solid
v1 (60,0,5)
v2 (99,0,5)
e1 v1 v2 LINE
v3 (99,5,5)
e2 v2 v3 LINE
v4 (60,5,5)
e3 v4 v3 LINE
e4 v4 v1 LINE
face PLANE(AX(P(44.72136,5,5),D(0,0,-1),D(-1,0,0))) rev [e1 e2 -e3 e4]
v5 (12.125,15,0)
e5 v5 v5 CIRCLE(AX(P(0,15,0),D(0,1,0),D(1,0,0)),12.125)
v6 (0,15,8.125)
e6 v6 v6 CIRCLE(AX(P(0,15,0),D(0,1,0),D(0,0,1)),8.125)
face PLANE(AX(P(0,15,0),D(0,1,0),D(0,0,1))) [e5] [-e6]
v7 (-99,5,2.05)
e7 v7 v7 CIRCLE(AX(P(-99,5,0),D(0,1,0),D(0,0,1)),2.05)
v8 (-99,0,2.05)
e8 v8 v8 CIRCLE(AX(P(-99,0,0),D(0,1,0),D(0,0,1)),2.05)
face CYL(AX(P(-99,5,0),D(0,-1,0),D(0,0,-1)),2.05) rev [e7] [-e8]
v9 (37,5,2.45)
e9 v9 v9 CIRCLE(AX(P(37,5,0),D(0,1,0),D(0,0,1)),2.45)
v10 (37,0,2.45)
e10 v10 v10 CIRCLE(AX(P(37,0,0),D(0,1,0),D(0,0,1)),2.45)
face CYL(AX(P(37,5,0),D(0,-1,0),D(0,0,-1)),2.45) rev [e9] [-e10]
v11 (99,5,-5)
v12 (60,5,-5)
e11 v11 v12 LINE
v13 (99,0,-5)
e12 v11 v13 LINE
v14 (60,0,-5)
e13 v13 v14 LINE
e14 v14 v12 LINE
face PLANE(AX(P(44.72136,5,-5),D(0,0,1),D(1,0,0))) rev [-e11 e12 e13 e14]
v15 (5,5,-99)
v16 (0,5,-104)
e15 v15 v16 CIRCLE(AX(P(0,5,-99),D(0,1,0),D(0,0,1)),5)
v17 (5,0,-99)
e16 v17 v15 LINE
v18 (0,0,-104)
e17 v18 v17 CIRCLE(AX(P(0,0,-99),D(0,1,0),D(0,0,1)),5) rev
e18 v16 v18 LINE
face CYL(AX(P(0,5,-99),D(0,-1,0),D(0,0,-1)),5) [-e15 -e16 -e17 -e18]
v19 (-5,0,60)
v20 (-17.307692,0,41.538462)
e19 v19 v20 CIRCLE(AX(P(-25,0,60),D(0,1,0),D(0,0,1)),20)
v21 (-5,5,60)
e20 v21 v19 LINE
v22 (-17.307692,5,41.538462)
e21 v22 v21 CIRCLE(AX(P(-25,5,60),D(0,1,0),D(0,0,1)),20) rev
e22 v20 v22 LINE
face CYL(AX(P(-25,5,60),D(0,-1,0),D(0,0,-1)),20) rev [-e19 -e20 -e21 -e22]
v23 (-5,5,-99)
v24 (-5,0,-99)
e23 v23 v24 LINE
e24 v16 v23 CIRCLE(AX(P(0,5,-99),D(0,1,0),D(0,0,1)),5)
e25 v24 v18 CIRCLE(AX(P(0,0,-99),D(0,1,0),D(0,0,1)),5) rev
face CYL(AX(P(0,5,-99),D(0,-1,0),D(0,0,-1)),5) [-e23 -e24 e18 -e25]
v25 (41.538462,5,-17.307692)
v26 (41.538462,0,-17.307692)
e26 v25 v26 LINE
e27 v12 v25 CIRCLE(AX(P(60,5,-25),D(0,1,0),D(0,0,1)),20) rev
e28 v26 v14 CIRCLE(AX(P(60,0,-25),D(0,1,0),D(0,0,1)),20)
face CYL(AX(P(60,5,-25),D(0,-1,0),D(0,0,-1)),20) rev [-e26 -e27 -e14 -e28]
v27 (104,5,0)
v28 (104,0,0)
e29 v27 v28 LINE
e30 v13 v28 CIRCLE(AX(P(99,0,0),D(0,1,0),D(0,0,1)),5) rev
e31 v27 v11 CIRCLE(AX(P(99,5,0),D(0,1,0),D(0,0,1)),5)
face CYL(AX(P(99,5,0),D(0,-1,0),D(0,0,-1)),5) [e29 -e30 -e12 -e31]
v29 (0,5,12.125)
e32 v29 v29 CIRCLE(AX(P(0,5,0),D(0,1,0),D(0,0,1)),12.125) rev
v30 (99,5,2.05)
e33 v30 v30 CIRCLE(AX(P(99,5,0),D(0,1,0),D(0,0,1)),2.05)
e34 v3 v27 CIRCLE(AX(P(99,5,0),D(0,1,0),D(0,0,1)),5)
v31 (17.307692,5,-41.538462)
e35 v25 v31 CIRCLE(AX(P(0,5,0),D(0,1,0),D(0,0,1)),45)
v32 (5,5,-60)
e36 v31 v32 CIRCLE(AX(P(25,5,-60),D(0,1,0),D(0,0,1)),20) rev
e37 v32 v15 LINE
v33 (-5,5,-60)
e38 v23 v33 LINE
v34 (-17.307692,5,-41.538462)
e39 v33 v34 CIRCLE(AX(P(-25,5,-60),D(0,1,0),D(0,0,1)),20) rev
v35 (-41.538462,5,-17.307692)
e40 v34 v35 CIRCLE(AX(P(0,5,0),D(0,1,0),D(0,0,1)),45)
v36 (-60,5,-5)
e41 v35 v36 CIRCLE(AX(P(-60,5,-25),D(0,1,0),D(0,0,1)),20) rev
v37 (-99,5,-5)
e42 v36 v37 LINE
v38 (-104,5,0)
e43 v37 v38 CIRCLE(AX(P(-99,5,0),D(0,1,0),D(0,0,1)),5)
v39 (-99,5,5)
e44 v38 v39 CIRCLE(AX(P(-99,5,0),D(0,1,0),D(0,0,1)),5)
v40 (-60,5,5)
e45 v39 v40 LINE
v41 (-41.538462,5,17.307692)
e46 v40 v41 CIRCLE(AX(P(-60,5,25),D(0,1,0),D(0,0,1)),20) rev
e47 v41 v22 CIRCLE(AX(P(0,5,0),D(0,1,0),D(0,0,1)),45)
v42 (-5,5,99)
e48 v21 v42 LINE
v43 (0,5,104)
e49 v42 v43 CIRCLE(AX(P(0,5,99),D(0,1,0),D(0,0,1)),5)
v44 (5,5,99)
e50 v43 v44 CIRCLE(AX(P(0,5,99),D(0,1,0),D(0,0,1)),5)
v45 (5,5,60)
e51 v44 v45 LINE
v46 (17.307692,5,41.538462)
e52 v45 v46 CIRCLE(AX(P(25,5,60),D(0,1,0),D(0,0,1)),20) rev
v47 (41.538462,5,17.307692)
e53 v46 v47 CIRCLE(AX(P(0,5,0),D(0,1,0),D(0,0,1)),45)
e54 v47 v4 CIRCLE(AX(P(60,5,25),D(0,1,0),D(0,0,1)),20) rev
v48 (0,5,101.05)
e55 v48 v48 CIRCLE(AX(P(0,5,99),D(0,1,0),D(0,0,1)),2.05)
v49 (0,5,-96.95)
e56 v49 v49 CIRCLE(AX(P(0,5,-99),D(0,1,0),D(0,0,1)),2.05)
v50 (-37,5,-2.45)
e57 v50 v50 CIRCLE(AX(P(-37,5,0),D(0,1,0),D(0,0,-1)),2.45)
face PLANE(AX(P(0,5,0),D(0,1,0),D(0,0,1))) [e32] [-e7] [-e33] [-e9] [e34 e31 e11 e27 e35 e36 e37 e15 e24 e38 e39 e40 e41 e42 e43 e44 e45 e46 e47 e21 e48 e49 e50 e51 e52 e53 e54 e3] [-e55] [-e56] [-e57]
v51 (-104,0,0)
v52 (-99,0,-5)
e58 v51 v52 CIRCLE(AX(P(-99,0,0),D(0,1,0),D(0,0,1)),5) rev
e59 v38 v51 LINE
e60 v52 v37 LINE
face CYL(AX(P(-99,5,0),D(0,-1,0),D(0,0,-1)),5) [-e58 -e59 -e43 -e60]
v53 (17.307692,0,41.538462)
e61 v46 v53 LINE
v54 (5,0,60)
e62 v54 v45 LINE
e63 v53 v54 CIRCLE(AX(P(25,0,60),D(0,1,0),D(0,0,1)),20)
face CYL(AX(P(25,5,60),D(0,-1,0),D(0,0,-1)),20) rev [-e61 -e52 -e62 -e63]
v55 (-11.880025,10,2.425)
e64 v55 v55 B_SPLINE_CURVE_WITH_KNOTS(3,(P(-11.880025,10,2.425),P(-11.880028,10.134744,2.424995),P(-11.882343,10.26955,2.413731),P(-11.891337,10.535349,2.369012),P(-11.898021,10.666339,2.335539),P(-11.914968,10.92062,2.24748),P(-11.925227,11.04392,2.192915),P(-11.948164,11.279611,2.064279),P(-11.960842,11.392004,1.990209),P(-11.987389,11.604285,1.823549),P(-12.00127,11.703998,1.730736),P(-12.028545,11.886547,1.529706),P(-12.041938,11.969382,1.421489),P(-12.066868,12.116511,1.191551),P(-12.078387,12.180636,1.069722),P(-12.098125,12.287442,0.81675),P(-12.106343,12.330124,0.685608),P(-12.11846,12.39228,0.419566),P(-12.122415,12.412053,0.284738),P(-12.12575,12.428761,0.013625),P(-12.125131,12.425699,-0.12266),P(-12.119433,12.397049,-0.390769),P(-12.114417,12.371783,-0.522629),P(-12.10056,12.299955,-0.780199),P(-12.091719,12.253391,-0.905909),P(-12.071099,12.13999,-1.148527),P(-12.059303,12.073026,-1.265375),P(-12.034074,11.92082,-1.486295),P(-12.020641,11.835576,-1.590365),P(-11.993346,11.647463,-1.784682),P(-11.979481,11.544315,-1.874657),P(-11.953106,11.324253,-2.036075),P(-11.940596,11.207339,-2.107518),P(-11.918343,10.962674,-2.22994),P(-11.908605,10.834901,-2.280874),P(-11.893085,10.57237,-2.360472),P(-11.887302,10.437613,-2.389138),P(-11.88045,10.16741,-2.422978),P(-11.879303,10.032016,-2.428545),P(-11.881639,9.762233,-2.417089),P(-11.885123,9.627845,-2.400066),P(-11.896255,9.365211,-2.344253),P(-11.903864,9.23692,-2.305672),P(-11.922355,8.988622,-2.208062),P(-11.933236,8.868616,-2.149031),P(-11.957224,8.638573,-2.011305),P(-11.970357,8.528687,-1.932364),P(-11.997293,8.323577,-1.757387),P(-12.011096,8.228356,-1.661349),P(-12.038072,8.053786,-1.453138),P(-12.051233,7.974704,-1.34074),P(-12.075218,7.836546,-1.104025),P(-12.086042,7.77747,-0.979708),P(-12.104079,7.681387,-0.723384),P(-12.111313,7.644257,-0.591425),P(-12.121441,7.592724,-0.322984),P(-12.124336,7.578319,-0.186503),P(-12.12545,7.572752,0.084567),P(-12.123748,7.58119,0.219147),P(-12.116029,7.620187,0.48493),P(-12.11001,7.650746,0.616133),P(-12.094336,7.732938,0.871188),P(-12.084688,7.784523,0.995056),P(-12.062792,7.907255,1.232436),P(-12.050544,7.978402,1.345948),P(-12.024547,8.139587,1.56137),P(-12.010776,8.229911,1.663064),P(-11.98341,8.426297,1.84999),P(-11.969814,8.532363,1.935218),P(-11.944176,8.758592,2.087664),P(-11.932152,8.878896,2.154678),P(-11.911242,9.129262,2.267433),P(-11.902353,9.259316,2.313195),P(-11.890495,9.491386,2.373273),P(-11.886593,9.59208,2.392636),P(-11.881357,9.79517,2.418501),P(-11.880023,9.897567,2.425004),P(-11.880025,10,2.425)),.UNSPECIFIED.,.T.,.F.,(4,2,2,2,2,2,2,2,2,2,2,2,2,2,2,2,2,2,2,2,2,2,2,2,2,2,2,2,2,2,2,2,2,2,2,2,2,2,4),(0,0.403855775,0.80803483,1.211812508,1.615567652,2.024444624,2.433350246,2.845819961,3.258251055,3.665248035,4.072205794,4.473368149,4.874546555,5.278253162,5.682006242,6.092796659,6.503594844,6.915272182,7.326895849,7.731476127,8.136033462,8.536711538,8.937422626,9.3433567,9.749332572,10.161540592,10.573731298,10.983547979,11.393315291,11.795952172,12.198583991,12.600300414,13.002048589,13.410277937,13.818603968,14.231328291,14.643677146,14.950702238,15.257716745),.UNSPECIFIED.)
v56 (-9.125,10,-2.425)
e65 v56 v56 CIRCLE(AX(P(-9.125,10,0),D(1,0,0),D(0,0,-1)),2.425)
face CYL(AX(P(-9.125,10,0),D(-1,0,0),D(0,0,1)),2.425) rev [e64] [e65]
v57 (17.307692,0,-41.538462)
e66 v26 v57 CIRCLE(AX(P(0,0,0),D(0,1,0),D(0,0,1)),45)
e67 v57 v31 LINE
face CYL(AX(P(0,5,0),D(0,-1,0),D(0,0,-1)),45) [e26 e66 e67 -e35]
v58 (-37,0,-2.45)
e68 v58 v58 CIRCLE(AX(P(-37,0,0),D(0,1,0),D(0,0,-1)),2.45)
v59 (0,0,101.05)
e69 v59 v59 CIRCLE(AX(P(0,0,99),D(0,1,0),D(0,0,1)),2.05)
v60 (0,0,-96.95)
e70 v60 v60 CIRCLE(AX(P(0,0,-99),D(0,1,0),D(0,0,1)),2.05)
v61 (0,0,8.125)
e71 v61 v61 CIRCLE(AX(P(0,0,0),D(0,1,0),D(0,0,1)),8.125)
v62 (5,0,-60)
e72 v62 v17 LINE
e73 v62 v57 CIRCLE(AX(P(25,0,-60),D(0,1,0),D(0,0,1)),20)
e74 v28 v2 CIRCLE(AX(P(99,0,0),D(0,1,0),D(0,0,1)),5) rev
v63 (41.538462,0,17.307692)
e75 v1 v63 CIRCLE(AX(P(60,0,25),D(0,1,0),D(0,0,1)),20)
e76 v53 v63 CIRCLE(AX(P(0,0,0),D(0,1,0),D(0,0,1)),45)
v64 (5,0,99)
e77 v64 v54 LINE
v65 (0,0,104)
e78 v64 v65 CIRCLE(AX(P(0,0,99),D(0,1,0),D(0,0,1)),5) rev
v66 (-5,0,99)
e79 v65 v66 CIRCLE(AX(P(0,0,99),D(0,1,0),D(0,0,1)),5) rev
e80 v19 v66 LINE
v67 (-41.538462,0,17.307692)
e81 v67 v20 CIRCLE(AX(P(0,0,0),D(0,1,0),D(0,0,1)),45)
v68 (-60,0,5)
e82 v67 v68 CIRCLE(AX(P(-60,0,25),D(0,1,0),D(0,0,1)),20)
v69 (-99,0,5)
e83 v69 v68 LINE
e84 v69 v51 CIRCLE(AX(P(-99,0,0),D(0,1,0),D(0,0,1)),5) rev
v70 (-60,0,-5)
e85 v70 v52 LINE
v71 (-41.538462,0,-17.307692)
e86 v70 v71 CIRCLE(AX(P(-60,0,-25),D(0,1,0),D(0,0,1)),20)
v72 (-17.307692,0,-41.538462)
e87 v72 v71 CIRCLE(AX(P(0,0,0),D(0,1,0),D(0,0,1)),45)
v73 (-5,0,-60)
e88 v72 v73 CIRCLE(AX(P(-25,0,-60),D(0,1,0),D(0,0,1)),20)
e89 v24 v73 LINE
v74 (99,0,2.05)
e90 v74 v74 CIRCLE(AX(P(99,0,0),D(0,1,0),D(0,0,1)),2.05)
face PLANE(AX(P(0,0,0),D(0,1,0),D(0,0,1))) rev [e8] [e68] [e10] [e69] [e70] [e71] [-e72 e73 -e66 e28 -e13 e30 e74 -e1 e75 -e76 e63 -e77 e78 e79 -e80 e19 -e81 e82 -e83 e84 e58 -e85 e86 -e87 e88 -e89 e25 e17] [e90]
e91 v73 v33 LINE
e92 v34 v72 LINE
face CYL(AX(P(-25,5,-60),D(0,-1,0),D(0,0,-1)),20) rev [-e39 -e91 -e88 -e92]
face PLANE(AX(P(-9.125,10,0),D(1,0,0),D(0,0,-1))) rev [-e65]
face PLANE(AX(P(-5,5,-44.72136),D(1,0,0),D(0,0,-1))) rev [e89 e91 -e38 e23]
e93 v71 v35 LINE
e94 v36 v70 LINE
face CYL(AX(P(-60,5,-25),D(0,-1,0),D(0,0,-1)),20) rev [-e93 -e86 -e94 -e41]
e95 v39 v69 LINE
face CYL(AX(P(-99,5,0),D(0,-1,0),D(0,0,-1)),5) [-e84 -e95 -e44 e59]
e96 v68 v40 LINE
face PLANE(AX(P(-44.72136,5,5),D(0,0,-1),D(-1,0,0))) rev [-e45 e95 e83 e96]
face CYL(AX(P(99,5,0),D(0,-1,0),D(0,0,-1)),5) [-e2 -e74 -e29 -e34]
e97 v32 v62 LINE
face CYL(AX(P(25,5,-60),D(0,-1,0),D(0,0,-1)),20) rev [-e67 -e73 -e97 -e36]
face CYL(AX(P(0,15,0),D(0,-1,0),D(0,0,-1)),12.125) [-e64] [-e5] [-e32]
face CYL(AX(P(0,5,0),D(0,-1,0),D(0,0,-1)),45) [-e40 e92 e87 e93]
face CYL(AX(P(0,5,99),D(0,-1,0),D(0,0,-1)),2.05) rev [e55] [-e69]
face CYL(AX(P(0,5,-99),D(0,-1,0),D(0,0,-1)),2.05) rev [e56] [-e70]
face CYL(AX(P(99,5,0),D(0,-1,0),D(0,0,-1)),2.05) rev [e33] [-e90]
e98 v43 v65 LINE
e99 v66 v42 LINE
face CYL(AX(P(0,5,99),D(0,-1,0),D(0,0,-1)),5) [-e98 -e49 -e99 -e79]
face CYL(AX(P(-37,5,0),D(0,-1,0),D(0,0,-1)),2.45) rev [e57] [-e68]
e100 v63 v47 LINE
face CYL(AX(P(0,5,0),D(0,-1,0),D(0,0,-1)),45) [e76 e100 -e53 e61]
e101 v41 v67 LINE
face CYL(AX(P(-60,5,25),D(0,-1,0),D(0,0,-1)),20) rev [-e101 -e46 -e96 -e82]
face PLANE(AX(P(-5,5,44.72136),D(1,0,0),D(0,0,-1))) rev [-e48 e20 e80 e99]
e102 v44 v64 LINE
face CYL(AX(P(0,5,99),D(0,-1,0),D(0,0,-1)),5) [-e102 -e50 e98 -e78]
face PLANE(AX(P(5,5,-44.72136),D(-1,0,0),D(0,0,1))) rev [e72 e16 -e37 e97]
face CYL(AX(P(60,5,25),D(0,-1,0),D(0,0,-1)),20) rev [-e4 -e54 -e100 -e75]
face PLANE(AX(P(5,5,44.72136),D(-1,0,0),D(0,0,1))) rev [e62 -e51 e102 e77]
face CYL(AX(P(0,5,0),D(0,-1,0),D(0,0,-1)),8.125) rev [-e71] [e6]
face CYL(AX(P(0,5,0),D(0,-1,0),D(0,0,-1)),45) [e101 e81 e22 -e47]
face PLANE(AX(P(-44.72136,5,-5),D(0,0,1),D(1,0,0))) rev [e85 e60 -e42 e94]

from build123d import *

# Parameters (mm, degrees)
CROQUIS1_R              = 45
CROQUIS1_R_2            = 2.45
CROQUIS1_R_3            = 8.125
SALIENTE_EXTRUIR1_DEPTH = 5
CROQUIS1_2_R            = 12.125
CROQUIS1_2_R_2          = 8.125
EXTRUIR_L_MINA1_DEPTH   = 15
CROQUIS2_R              = 2.425
CORTAR_EXTRUIR2_DEPTH   = 3
CROQUIS3_W              = 59.27864045
CROQUIS3_H              = 10
CROQUIS3_R              = 2.05
CROQUIS3_W_2            = 10
CROQUIS3_H_2            = 59.27864045
SALIENTE_EXTRUIR2_DEPTH = 5
REDONDEO1_R             = 5
REDONDEO2_R             = 20


with BuildPart() as part:
    # Croquis1 → Saliente-Extruir1 (new body)
    with BuildSketch(Plane(origin=(0, 0, 0), x_dir=(1, 0, 0), z_dir=(0, 1, 0))):
        with Locations(Location((0, 0, 0), (0, 0, 270))):
            Circle(CROQUIS1_R)
        with Locations(Location((37, 0, 0), (0, 0, 270))):
            Circle(CROQUIS1_R_2, mode=Mode.SUBTRACT)
        with Locations(Location((-37, 0, 0), (0, 0, 90))):
            Circle(CROQUIS1_R_2, mode=Mode.SUBTRACT)
        with Locations(Location((0, 0, 0), (0, 0, 270))):
            Circle(CROQUIS1_R_3, mode=Mode.SUBTRACT)
    extrude(amount=SALIENTE_EXTRUIR1_DEPTH)

    # Croquis1<2> → Extruir-Lámina1 (add)
    with BuildSketch(Plane(origin=(0, 0, 0), x_dir=(1, 0, 0), z_dir=(0, 1, 0))):
        Circle(CROQUIS1_2_R)
        Circle(CROQUIS1_2_R_2, mode=Mode.SUBTRACT)
    extrude(amount=EXTRUIR_L_MINA1_DEPTH)

    # Croquis2 → Cortar-Extruir2 (cut)
    with BuildSketch(Plane(origin=(-12.125, 0, -11.125), x_dir=(0, 0, -1), z_dir=(1, 0, 0))):
        with Locations(Location((-11.125, 10, 0), (0, 0, 180))):
            Circle(CROQUIS2_R)
    extrude(amount=CORTAR_EXTRUIR2_DEPTH, mode=Mode.SUBTRACT)

    # Croquis3 → Saliente-Extruir2 (add)
    # profile 1 of 4: a face of its own
    with BuildSketch(Plane(origin=(0, 0, 0), x_dir=(1, 0, 0), z_dir=(0, 1, 0))):
        with Locations((74.360679775, 0)):
            Rectangle(CROQUIS3_W, CROQUIS3_H)
        with Locations(Location((99, 0, 0), (0, 0, 270))):
            Circle(CROQUIS3_R, mode=Mode.SUBTRACT)
    # profile 2 of 4: a face of its own
    with BuildSketch(Plane(origin=(0, 0, 0), x_dir=(1, 0, 0), z_dir=(0, 1, 0))):
        with Locations((0, 74.360679775)):
            Rectangle(CROQUIS3_W_2, CROQUIS3_H_2)
        with Locations(Location((0, 99, 0), (0, 0, 270))):
            Circle(CROQUIS3_R, mode=Mode.SUBTRACT)
    # profile 3 of 4: a face of its own
    with BuildSketch(Plane(origin=(0, 0, 0), x_dir=(1, 0, 0), z_dir=(0, 1, 0))):
        with Locations((0, -74.360679775)):
            Rectangle(CROQUIS3_W_2, CROQUIS3_H_2)
        with Locations(Location((0, -99, 0), (0, 0, 270))):
            Circle(CROQUIS3_R, mode=Mode.SUBTRACT)
    # profile 4 of 4: a face of its own
    with BuildSketch(Plane(origin=(0, 0, 0), x_dir=(1, 0, 0), z_dir=(0, 1, 0))):
        with Locations((-74.360679775, 0)):
            Rectangle(CROQUIS3_W, CROQUIS3_H)
        with Locations(Location((-99, 0, 0), (0, 0, 270))):
            Circle(CROQUIS3_R, mode=Mode.SUBTRACT)
    extrude(amount=SALIENTE_EXTRUIR2_DEPTH)

    # Redondeo1
    redondeo1_edges = [part.edges().sort_by_distance(p)[0] for p in [
        (5, 2.5, 104),
        (-5, 2.5, 104),
        (-104, 2.5, 5),
        (-104, 2.5, -5),
        (-5, 2.5, -104),
        (5, 2.5, -104),
        (104, 2.5, -5),
        (104, 2.5, 5),
    ]]
    fillet(redondeo1_edges, radius=REDONDEO1_R - 0.0001)  # a hair under: the kernel refuses the full size

    # Redondeo2
    redondeo2_edges = [part.edges().sort_by_distance(p)[0] for p in [
        (-5, 2.5, -44.72135955),
        (5, 2.5, -44.72135955),
        (44.72135955, 2.5, -5),
        (44.72135955, 2.5, 5),
        (5, 2.5, 44.72135955),
        (-5, 2.5, 44.72135955),
        (-44.72135955, 2.5, 5),
        (-44.72135955, 2.5, -5),
    ]]
    fillet(redondeo2_edges, radius=REDONDEO2_R)


solid = part.part
